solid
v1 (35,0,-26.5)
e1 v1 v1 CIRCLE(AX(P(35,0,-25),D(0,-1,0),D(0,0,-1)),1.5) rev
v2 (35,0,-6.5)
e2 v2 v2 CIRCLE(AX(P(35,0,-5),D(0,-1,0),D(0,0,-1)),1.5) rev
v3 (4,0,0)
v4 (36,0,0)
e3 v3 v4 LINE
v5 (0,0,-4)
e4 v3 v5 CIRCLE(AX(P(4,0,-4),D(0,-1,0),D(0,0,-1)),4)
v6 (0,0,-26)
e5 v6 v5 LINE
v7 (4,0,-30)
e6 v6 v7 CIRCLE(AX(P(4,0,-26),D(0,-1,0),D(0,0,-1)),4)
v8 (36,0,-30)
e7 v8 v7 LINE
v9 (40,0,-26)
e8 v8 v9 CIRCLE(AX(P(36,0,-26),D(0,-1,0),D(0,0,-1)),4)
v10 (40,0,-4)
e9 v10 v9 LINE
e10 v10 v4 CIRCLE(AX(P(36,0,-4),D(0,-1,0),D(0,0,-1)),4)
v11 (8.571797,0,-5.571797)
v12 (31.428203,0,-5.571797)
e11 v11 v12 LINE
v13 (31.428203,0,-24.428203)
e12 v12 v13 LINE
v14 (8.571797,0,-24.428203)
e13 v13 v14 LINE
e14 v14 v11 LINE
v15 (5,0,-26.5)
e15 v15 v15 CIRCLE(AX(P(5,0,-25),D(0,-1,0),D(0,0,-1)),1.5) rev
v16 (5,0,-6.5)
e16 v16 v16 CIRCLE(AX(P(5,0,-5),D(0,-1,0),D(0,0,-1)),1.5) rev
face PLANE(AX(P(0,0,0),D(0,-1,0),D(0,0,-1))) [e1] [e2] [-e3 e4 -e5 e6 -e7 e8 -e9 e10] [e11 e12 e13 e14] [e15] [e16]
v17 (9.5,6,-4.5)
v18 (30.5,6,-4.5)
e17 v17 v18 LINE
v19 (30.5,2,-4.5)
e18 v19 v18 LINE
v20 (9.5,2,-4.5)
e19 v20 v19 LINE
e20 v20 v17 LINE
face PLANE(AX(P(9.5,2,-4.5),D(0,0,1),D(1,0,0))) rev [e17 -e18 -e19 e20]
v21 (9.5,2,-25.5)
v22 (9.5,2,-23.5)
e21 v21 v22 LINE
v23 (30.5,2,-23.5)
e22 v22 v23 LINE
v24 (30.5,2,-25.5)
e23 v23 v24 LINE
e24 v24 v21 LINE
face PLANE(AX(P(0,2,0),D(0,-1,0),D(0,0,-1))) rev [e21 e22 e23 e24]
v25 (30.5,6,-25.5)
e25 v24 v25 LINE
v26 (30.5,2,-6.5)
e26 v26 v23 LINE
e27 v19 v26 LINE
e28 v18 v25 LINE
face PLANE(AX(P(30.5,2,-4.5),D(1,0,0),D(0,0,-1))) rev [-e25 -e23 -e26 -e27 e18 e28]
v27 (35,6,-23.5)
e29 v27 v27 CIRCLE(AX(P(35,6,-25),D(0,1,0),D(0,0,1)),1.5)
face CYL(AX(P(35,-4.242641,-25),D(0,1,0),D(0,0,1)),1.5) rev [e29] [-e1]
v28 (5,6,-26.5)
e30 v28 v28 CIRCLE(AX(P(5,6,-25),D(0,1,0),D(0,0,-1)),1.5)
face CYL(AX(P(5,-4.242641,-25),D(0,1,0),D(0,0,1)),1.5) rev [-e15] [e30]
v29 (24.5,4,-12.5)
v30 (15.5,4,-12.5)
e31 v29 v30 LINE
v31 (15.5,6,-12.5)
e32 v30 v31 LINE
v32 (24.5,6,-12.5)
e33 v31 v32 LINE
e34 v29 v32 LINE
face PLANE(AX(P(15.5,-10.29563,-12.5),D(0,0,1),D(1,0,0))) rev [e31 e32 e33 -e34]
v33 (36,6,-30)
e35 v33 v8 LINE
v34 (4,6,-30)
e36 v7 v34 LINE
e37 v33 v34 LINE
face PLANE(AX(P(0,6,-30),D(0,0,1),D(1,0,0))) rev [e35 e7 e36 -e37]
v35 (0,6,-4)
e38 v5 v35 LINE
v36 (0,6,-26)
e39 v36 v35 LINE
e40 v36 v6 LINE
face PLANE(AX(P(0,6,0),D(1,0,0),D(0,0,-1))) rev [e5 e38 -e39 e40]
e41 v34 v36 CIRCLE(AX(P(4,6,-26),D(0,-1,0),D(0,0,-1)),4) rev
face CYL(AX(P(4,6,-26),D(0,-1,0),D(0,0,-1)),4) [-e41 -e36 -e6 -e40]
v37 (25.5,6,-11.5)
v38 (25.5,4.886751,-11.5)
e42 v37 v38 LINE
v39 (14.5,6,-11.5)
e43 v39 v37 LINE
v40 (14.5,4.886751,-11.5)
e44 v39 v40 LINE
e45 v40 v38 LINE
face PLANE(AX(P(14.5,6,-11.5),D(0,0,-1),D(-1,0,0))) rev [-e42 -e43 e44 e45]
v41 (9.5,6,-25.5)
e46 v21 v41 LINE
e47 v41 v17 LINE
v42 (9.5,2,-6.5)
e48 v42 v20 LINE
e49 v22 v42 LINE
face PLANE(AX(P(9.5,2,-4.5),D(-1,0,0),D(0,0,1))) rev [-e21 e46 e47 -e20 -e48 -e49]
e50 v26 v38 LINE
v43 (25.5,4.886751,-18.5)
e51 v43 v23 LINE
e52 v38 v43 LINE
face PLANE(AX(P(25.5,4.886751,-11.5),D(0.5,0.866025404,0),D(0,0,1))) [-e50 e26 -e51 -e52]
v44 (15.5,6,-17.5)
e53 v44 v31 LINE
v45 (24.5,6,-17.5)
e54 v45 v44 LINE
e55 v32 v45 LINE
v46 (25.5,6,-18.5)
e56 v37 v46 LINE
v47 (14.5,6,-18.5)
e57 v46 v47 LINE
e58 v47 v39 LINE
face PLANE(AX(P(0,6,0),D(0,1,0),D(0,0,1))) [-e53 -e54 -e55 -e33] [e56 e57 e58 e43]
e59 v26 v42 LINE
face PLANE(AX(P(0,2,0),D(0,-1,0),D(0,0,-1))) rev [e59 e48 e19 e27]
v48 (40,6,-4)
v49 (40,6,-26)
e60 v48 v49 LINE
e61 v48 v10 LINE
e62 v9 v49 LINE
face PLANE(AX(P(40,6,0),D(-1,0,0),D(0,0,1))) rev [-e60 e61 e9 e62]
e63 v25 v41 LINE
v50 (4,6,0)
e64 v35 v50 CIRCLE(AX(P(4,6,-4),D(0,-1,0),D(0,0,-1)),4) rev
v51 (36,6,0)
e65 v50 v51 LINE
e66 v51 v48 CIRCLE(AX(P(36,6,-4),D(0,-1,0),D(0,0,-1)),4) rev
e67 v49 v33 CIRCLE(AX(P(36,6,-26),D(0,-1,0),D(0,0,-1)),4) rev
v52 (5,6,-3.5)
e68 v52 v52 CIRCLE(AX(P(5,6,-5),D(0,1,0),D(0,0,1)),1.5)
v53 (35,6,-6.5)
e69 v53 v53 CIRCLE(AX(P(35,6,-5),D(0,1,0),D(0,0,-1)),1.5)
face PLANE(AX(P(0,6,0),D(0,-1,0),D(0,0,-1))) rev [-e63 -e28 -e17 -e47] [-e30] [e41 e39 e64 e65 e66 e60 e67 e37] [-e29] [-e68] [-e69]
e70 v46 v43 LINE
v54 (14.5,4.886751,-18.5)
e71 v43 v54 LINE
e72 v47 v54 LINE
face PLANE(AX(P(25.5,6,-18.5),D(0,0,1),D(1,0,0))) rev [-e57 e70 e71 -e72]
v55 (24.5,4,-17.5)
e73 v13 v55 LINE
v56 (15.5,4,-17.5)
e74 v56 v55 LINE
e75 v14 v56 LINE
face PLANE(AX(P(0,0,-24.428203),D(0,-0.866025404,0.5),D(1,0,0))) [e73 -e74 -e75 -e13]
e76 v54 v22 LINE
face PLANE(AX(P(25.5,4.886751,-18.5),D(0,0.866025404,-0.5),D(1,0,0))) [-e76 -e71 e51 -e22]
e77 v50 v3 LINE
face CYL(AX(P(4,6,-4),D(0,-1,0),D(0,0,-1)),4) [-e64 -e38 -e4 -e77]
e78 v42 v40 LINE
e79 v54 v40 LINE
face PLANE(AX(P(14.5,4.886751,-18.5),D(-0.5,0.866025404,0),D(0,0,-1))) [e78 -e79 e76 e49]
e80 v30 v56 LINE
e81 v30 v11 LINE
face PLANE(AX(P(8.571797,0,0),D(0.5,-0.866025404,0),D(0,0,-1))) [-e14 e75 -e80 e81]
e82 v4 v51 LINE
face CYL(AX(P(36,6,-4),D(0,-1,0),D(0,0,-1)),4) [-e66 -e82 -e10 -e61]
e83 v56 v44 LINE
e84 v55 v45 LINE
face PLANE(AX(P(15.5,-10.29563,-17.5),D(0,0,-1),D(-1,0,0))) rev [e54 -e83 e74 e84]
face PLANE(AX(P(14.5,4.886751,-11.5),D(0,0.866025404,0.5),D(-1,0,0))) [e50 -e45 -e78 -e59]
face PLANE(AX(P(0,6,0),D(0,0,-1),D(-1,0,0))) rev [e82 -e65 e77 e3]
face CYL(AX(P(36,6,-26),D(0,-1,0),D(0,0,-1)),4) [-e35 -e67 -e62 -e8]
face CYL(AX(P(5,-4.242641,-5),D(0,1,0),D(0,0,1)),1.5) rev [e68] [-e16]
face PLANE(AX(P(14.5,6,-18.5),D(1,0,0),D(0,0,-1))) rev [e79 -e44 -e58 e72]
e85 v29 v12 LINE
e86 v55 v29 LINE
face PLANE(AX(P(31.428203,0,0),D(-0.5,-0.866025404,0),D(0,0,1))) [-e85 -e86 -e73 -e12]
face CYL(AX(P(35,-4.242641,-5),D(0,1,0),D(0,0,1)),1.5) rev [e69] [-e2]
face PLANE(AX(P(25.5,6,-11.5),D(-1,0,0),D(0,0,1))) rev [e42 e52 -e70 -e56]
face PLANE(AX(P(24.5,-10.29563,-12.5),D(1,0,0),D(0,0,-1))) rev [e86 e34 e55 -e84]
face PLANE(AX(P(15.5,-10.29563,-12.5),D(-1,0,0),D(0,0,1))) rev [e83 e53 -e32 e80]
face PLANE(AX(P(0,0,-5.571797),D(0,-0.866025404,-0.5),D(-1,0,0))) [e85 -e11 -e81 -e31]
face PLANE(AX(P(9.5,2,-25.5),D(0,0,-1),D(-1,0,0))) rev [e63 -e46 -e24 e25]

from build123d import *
from OCP.BRepFilletAPI import BRepFilletAPI_MakeChamfer

# Parameters (mm, degrees)
SKETCH1_W           = 40
SKETCH1_H           = 30
BOSS_EXTRUDE1_DEPTH = 6
SKETCH2_R           = 1.5
CUT_EXTRUDE1_DEPTH  = 6
FILLET1_R           = 4
SKETCH3_W           = 21
SKETCH3_H           = 21
CUT_EXTRUDE2_DEPTH  = 4
SKETCH6_W           = 9
SKETCH6_H           = 5
CUT_EXTRUDE3_DEPTH  = 2
SKETCH7_W           = 11
SKETCH7_H           = 7
SKETCH7_W_2         = 9
SKETCH7_H_2         = 5
BOSS_EXTRUDE2_DEPTH = 4
CHAMFER1_SIZE       = 4
CHAMFER1_SIZE2      = 6.92820323
CHAMFER2_SIZE       = 2.886751346
CHAMFER2_SIZE_2     = 5


with BuildPart() as part:
    # Sketch1 → Boss-Extrude1 (new body)
    with BuildSketch(Plane(origin=(0, 0, 0), x_dir=(1, 0, 0), z_dir=(0, 1, 0))):
        with Locations((20, 15)):
            Rectangle(SKETCH1_W, SKETCH1_H)
    extrude(amount=BOSS_EXTRUDE1_DEPTH)

    # Sketch2 → Cut-Extrude1 (cut)
    with BuildSketch(Plane(origin=(0, 6, 0), x_dir=(1, 0, 0), z_dir=(0, 1, 0))):
        with Locations(Location((5, 5, 0), (0, 0, 270))):
            Circle(SKETCH2_R)
        with Locations(Location((5, 25, 0), (0, 0, 90))):
            Circle(SKETCH2_R)
        with Locations(Location((35, 5, 0), (0, 0, 90))):
            Circle(SKETCH2_R)
        with Locations(Location((35, 25, 0), (0, 0, 270))):
            Circle(SKETCH2_R)
    extrude(amount=-CUT_EXTRUDE1_DEPTH, mode=Mode.SUBTRACT)

    # Fillet1
    fillet1_edges = [part.edges().sort_by_distance(p)[0] for p in [
        (0, 3, -30),
        (40, 3, -30),
        (40, 3, 0),
        (0, 3, 0),
    ]]
    fillet(fillet1_edges, radius=FILLET1_R)

    # Sketch3 → Cut-Extrude2 (cut)
    with BuildSketch(Plane(origin=(0, 6, 0), x_dir=(1, 0, 0), z_dir=(0, 1, 0))):
        with Locations((20, 15)):
            Rectangle(SKETCH3_W, SKETCH3_H)
    extrude(amount=-CUT_EXTRUDE2_DEPTH, mode=Mode.SUBTRACT)

    # Sketch6 → Cut-Extrude3 (cut)
    with BuildSketch(Plane(origin=(0, 2, 0), x_dir=(1, 0, 0), z_dir=(0, 1, 0))):
        with Locations((20, 15)):
            Rectangle(SKETCH6_W, SKETCH6_H)
    extrude(amount=-CUT_EXTRUDE3_DEPTH, mode=Mode.SUBTRACT)

    # Sketch7 → Boss-Extrude2 (add)
    with BuildSketch(Plane(origin=(0, 2, 0), x_dir=(1, 0, 0), z_dir=(0, 1, 0))):
        with Locations((20, 15)):
            Rectangle(SKETCH7_W, SKETCH7_H)
        with Locations((20, 15)):
            Rectangle(SKETCH7_W_2, SKETCH7_H_2, mode=Mode.SUBTRACT)
    extrude(amount=BOSS_EXTRUDE2_DEPTH)

    # Chamfer1: one chamfer whose edges measure the first distance from different faces: ONE call of the kernel's chamfer builder (chamfer() names one face for all edges)
    chamfer1_edges_1 = [part.edges().sort_by_distance(p)[0] for p in [
        (20, 0, -12.5),
    ]]
    chamfer1_side_1 = [part.faces().sort_by_distance(p)[0] for p in [
        (20, 3, -12.5),
    ]]
    chamfer1_edges_2 = [part.edges().sort_by_distance(p)[0] for p in [
        (24.5, 0, -15),
    ]]
    chamfer1_side_2 = [part.faces().sort_by_distance(p)[0] for p in [
        (24.5, 3, -15),
    ]]
    chamfer1_edges_3 = [part.edges().sort_by_distance(p)[0] for p in [
        (20, 0, -17.5),
    ]]
    chamfer1_side_3 = [part.faces().sort_by_distance(p)[0] for p in [
        (20, 3, -17.5),
    ]]
    chamfer1_edges_4 = [part.edges().sort_by_distance(p)[0] for p in [
        (15.5, 0, -15),
    ]]
    chamfer1_side_4 = [part.faces().sort_by_distance(p)[0] for p in [
        (15.5, 3, -15),
    ]]
    chamfer1 = BRepFilletAPI_MakeChamfer(part.part.solid().wrapped)
    for e in chamfer1_edges_1:
        chamfer1.Add(CHAMFER1_SIZE, CHAMFER1_SIZE2, e.wrapped, chamfer1_side_1[0].wrapped)  # the first distance lies on this face
    for e in chamfer1_edges_2:
        chamfer1.Add(CHAMFER1_SIZE, CHAMFER1_SIZE2, e.wrapped, chamfer1_side_2[0].wrapped)  # the first distance lies on this face
    for e in chamfer1_edges_3:
        chamfer1.Add(CHAMFER1_SIZE, CHAMFER1_SIZE2, e.wrapped, chamfer1_side_3[0].wrapped)  # the first distance lies on this face
    for e in chamfer1_edges_4:
        chamfer1.Add(CHAMFER1_SIZE, CHAMFER1_SIZE2, e.wrapped, chamfer1_side_4[0].wrapped)  # the first distance lies on this face
    add(Compound.cast(chamfer1.Shape()), mode=Mode.REPLACE)

    # Chamfer2
    # the kernel refuses this chamfer: 5, 2.886751346 mm, written as the material it adds along each edge
    with BuildSketch(Plane(origin=(14.5, 2, -31.435428773), x_dir=(0, 1, 0), z_dir=(0, 0, 1))) as chamfer2_piece_1_section:
        Polygon((CHAMFER2_SIZE, 0), (0, CHAMFER2_SIZE_2), (0, 0), align=None)
    chamfer2_piece_1 = extrude(amount=32.870857546, mode=Mode.PRIVATE)
    chamfer2_piece_1 = split(chamfer2_piece_1, bisect_by=Plane(origin=(13.883974596, 3.066987298, -31.435428773), z_dir=(-0.499999999999998, 0.8660254037844398, 0)), keep=Keep.TOP, mode=Mode.PRIVATE)
    chamfer2_piece_1 = split(chamfer2_piece_1, bisect_by=Plane(origin=(14.5, -1.436141454, -29.45157158), z_dir=(0, -0.8660254037844382, 0.500000000000001)), keep=Keep.TOP, mode=Mode.PRIVATE)
    chamfer2_piece_1 = split(chamfer2_piece_1, bisect_by=Plane(origin=(14.5, 12.797357386, -25.20157158), z_dir=(0, -0.8660254037844382, -0.500000000000001)), keep=Keep.TOP, mode=Mode.PRIVATE)
    with BuildSketch(Plane(origin=(14.5, 2, -31.435428773), x_dir=(0, 1, 0), z_dir=(0, 0, 1))) as chamfer2_piece_2_section:
        Polygon((CHAMFER2_SIZE, 0), (0, CHAMFER2_SIZE_2), (0, 0), align=None)
    chamfer2_piece_2 = extrude(amount=32.870857546, mode=Mode.PRIVATE)
    chamfer2_piece_2 = split(chamfer2_piece_2, bisect_by=Plane(origin=(14.5, -2.534217665, -28.817596984), z_dir=(0, 0.8660254037844398, -0.499999999999998)), keep=Keep.TOP, mode=Mode.PRIVATE)
    chamfer2_piece_2 = split(chamfer2_piece_2, bisect_by=Plane(origin=(14.5, -1.436141454, -29.45157158), z_dir=(0, -0.8660254037844382, 0.500000000000001)), keep=Keep.TOP, mode=Mode.PRIVATE)
    with BuildSketch(Plane(origin=(14.5, 2, -31.435428773), x_dir=(0, 1, 0), z_dir=(0, 0, 1))) as chamfer2_piece_3_section:
        Polygon((CHAMFER2_SIZE, 0), (0, CHAMFER2_SIZE_2), (0, 0), align=None)
    chamfer2_piece_3 = extrude(amount=32.870857546, mode=Mode.PRIVATE)
    chamfer2_piece_3 = split(chamfer2_piece_3, bisect_by=Plane(origin=(14.5, 11.699281175, -25.835546176), z_dir=(0, 0.8660254037844398, 0.49999999999999795)), keep=Keep.TOP, mode=Mode.PRIVATE)
    chamfer2_piece_3 = split(chamfer2_piece_3, bisect_by=Plane(origin=(14.5, 12.797357386, -25.20157158), z_dir=(0, -0.8660254037844382, -0.500000000000001)), keep=Keep.TOP, mode=Mode.PRIVATE)
    with BuildSketch(Plane(origin=(1.564571227, 2, -11.5), x_dir=(0, 1, 0), z_dir=(1, 0, 0))) as chamfer2_piece_4_section:
        Polygon((CHAMFER2_SIZE, 0), (0, CHAMFER2_SIZE_2), (0, 0), align=None)
    chamfer2_piece_4 = extrude(amount=36.870857546, mode=Mode.PRIVATE)
    chamfer2_piece_4 = split(chamfer2_piece_4, bisect_by=Plane(origin=(1.564571227, 3.066987298, -10.883974596), z_dir=(0, 0.8660254037844398, 0.49999999999999795)), keep=Keep.TOP, mode=Mode.PRIVATE)
    chamfer2_piece_4 = split(chamfer2_piece_4, bisect_by=Plane(origin=(8.79842842, 14.529408194, -11.5), z_dir=(-0.500000000000001, -0.8660254037844382, 0)), keep=Keep.TOP, mode=Mode.PRIVATE)
    chamfer2_piece_4 = split(chamfer2_piece_4, bisect_by=Plane(origin=(3.54842842, -1.436141454, -11.5), z_dir=(0.500000000000001, -0.8660254037844382, 0)), keep=Keep.TOP, mode=Mode.PRIVATE)
    with BuildSketch(Plane(origin=(1.564571227, 2, -11.5), x_dir=(0, 1, 0), z_dir=(1, 0, 0))) as chamfer2_piece_5_section:
        Polygon((CHAMFER2_SIZE, 0), (0, CHAMFER2_SIZE_2), (0, 0), align=None)
    chamfer2_piece_5 = extrude(amount=36.870857546, mode=Mode.PRIVATE)
    chamfer2_piece_5 = split(chamfer2_piece_5, bisect_by=Plane(origin=(4.182403016, -2.534217665, -11.5), z_dir=(-0.499999999999998, 0.8660254037844398, 0)), keep=Keep.TOP, mode=Mode.PRIVATE)
    chamfer2_piece_5 = split(chamfer2_piece_5, bisect_by=Plane(origin=(3.54842842, -1.436141454, -11.5), z_dir=(0.500000000000001, -0.8660254037844382, 0)), keep=Keep.TOP, mode=Mode.PRIVATE)
    with BuildSketch(Plane(origin=(25.5, 2, 1.435428773), x_dir=(0, 1, 0), z_dir=(0, 0, -1))) as chamfer2_piece_6_section:
        Polygon((CHAMFER2_SIZE, 0), (0, CHAMFER2_SIZE_2), (0, 0), align=None)
    chamfer2_piece_6 = extrude(amount=32.870857546, mode=Mode.PRIVATE)
    chamfer2_piece_6 = split(chamfer2_piece_6, bisect_by=Plane(origin=(26.116025404, 3.066987298, 1.435428773), z_dir=(0.499999999999998, 0.8660254037844398, 0)), keep=Keep.TOP, mode=Mode.PRIVATE)
    chamfer2_piece_6 = split(chamfer2_piece_6, bisect_by=Plane(origin=(25.5, 12.797357386, -4.79842842), z_dir=(0, -0.8660254037844382, 0.500000000000001)), keep=Keep.TOP, mode=Mode.PRIVATE)
    chamfer2_piece_6 = split(chamfer2_piece_6, bisect_by=Plane(origin=(25.5, -1.436141454, -0.54842842), z_dir=(0, -0.8660254037844382, -0.500000000000001)), keep=Keep.TOP, mode=Mode.PRIVATE)
    with BuildSketch(Plane(origin=(25.5, 2, 1.435428773), x_dir=(0, 1, 0), z_dir=(0, 0, -1))) as chamfer2_piece_7_section:
        Polygon((CHAMFER2_SIZE, 0), (0, CHAMFER2_SIZE_2), (0, 0), align=None)
    chamfer2_piece_7 = extrude(amount=32.870857546, mode=Mode.PRIVATE)
    chamfer2_piece_7 = split(chamfer2_piece_7, bisect_by=Plane(origin=(25.5, -2.534217665, -1.182403016), z_dir=(0, 0.8660254037844398, 0.49999999999999795)), keep=Keep.TOP, mode=Mode.PRIVATE)
    chamfer2_piece_7 = split(chamfer2_piece_7, bisect_by=Plane(origin=(25.5, -1.436141454, -0.54842842), z_dir=(0, -0.8660254037844382, -0.500000000000001)), keep=Keep.TOP, mode=Mode.PRIVATE)
    with BuildSketch(Plane(origin=(25.5, 2, 1.435428773), x_dir=(0, 1, 0), z_dir=(0, 0, -1))) as chamfer2_piece_8_section:
        Polygon((CHAMFER2_SIZE, 0), (0, CHAMFER2_SIZE_2), (0, 0), align=None)
    chamfer2_piece_8 = extrude(amount=32.870857546, mode=Mode.PRIVATE)
    chamfer2_piece_8 = split(chamfer2_piece_8, bisect_by=Plane(origin=(25.5, 11.699281175, -4.164453824), z_dir=(0, 0.8660254037844398, -0.499999999999998)), keep=Keep.TOP, mode=Mode.PRIVATE)
    chamfer2_piece_8 = split(chamfer2_piece_8, bisect_by=Plane(origin=(25.5, 12.797357386, -4.79842842), z_dir=(0, -0.8660254037844382, 0.500000000000001)), keep=Keep.TOP, mode=Mode.PRIVATE)
    with BuildSketch(Plane(origin=(38.435428773, 2, -18.5), x_dir=(0, 1, 0), z_dir=(-1, 0, 0))) as chamfer2_piece_9_section:
        Polygon((CHAMFER2_SIZE, 0), (0, CHAMFER2_SIZE_2), (0, 0), align=None)
    chamfer2_piece_9 = extrude(amount=36.870857546, mode=Mode.PRIVATE)
    chamfer2_piece_9 = split(chamfer2_piece_9, bisect_by=Plane(origin=(38.435428773, 3.066987298, -19.116025404), z_dir=(0, 0.8660254037844398, -0.499999999999998)), keep=Keep.TOP, mode=Mode.PRIVATE)
    chamfer2_piece_9 = split(chamfer2_piece_9, bisect_by=Plane(origin=(36.45157158, -1.436141454, -18.5), z_dir=(-0.500000000000001, -0.8660254037844382, 0)), keep=Keep.TOP, mode=Mode.PRIVATE)
    chamfer2_piece_9 = split(chamfer2_piece_9, bisect_by=Plane(origin=(31.20157158, 14.529408194, -18.5), z_dir=(0.500000000000001, -0.8660254037844382, 0)), keep=Keep.TOP, mode=Mode.PRIVATE)
    with BuildSketch(Plane(origin=(38.435428773, 2, -18.5), x_dir=(0, 1, 0), z_dir=(-1, 0, 0))) as chamfer2_piece_10_section:
        Polygon((CHAMFER2_SIZE, 0), (0, CHAMFER2_SIZE_2), (0, 0), align=None)
    chamfer2_piece_10 = extrude(amount=36.870857546, mode=Mode.PRIVATE)
    chamfer2_piece_10 = split(chamfer2_piece_10, bisect_by=Plane(origin=(31.835546176, 13.431331982, -18.5), z_dir=(-0.499999999999998, 0.8660254037844398, 0)), keep=Keep.TOP, mode=Mode.PRIVATE)
    chamfer2_piece_10 = split(chamfer2_piece_10, bisect_by=Plane(origin=(31.20157158, 14.529408194, -18.5), z_dir=(0.500000000000001, -0.8660254037844382, 0)), keep=Keep.TOP, mode=Mode.PRIVATE)
    add([chamfer2_piece_1, chamfer2_piece_2, chamfer2_piece_3, chamfer2_piece_4, chamfer2_piece_5, chamfer2_piece_6, chamfer2_piece_7, chamfer2_piece_8, chamfer2_piece_9, chamfer2_piece_10])


solid = part.part
